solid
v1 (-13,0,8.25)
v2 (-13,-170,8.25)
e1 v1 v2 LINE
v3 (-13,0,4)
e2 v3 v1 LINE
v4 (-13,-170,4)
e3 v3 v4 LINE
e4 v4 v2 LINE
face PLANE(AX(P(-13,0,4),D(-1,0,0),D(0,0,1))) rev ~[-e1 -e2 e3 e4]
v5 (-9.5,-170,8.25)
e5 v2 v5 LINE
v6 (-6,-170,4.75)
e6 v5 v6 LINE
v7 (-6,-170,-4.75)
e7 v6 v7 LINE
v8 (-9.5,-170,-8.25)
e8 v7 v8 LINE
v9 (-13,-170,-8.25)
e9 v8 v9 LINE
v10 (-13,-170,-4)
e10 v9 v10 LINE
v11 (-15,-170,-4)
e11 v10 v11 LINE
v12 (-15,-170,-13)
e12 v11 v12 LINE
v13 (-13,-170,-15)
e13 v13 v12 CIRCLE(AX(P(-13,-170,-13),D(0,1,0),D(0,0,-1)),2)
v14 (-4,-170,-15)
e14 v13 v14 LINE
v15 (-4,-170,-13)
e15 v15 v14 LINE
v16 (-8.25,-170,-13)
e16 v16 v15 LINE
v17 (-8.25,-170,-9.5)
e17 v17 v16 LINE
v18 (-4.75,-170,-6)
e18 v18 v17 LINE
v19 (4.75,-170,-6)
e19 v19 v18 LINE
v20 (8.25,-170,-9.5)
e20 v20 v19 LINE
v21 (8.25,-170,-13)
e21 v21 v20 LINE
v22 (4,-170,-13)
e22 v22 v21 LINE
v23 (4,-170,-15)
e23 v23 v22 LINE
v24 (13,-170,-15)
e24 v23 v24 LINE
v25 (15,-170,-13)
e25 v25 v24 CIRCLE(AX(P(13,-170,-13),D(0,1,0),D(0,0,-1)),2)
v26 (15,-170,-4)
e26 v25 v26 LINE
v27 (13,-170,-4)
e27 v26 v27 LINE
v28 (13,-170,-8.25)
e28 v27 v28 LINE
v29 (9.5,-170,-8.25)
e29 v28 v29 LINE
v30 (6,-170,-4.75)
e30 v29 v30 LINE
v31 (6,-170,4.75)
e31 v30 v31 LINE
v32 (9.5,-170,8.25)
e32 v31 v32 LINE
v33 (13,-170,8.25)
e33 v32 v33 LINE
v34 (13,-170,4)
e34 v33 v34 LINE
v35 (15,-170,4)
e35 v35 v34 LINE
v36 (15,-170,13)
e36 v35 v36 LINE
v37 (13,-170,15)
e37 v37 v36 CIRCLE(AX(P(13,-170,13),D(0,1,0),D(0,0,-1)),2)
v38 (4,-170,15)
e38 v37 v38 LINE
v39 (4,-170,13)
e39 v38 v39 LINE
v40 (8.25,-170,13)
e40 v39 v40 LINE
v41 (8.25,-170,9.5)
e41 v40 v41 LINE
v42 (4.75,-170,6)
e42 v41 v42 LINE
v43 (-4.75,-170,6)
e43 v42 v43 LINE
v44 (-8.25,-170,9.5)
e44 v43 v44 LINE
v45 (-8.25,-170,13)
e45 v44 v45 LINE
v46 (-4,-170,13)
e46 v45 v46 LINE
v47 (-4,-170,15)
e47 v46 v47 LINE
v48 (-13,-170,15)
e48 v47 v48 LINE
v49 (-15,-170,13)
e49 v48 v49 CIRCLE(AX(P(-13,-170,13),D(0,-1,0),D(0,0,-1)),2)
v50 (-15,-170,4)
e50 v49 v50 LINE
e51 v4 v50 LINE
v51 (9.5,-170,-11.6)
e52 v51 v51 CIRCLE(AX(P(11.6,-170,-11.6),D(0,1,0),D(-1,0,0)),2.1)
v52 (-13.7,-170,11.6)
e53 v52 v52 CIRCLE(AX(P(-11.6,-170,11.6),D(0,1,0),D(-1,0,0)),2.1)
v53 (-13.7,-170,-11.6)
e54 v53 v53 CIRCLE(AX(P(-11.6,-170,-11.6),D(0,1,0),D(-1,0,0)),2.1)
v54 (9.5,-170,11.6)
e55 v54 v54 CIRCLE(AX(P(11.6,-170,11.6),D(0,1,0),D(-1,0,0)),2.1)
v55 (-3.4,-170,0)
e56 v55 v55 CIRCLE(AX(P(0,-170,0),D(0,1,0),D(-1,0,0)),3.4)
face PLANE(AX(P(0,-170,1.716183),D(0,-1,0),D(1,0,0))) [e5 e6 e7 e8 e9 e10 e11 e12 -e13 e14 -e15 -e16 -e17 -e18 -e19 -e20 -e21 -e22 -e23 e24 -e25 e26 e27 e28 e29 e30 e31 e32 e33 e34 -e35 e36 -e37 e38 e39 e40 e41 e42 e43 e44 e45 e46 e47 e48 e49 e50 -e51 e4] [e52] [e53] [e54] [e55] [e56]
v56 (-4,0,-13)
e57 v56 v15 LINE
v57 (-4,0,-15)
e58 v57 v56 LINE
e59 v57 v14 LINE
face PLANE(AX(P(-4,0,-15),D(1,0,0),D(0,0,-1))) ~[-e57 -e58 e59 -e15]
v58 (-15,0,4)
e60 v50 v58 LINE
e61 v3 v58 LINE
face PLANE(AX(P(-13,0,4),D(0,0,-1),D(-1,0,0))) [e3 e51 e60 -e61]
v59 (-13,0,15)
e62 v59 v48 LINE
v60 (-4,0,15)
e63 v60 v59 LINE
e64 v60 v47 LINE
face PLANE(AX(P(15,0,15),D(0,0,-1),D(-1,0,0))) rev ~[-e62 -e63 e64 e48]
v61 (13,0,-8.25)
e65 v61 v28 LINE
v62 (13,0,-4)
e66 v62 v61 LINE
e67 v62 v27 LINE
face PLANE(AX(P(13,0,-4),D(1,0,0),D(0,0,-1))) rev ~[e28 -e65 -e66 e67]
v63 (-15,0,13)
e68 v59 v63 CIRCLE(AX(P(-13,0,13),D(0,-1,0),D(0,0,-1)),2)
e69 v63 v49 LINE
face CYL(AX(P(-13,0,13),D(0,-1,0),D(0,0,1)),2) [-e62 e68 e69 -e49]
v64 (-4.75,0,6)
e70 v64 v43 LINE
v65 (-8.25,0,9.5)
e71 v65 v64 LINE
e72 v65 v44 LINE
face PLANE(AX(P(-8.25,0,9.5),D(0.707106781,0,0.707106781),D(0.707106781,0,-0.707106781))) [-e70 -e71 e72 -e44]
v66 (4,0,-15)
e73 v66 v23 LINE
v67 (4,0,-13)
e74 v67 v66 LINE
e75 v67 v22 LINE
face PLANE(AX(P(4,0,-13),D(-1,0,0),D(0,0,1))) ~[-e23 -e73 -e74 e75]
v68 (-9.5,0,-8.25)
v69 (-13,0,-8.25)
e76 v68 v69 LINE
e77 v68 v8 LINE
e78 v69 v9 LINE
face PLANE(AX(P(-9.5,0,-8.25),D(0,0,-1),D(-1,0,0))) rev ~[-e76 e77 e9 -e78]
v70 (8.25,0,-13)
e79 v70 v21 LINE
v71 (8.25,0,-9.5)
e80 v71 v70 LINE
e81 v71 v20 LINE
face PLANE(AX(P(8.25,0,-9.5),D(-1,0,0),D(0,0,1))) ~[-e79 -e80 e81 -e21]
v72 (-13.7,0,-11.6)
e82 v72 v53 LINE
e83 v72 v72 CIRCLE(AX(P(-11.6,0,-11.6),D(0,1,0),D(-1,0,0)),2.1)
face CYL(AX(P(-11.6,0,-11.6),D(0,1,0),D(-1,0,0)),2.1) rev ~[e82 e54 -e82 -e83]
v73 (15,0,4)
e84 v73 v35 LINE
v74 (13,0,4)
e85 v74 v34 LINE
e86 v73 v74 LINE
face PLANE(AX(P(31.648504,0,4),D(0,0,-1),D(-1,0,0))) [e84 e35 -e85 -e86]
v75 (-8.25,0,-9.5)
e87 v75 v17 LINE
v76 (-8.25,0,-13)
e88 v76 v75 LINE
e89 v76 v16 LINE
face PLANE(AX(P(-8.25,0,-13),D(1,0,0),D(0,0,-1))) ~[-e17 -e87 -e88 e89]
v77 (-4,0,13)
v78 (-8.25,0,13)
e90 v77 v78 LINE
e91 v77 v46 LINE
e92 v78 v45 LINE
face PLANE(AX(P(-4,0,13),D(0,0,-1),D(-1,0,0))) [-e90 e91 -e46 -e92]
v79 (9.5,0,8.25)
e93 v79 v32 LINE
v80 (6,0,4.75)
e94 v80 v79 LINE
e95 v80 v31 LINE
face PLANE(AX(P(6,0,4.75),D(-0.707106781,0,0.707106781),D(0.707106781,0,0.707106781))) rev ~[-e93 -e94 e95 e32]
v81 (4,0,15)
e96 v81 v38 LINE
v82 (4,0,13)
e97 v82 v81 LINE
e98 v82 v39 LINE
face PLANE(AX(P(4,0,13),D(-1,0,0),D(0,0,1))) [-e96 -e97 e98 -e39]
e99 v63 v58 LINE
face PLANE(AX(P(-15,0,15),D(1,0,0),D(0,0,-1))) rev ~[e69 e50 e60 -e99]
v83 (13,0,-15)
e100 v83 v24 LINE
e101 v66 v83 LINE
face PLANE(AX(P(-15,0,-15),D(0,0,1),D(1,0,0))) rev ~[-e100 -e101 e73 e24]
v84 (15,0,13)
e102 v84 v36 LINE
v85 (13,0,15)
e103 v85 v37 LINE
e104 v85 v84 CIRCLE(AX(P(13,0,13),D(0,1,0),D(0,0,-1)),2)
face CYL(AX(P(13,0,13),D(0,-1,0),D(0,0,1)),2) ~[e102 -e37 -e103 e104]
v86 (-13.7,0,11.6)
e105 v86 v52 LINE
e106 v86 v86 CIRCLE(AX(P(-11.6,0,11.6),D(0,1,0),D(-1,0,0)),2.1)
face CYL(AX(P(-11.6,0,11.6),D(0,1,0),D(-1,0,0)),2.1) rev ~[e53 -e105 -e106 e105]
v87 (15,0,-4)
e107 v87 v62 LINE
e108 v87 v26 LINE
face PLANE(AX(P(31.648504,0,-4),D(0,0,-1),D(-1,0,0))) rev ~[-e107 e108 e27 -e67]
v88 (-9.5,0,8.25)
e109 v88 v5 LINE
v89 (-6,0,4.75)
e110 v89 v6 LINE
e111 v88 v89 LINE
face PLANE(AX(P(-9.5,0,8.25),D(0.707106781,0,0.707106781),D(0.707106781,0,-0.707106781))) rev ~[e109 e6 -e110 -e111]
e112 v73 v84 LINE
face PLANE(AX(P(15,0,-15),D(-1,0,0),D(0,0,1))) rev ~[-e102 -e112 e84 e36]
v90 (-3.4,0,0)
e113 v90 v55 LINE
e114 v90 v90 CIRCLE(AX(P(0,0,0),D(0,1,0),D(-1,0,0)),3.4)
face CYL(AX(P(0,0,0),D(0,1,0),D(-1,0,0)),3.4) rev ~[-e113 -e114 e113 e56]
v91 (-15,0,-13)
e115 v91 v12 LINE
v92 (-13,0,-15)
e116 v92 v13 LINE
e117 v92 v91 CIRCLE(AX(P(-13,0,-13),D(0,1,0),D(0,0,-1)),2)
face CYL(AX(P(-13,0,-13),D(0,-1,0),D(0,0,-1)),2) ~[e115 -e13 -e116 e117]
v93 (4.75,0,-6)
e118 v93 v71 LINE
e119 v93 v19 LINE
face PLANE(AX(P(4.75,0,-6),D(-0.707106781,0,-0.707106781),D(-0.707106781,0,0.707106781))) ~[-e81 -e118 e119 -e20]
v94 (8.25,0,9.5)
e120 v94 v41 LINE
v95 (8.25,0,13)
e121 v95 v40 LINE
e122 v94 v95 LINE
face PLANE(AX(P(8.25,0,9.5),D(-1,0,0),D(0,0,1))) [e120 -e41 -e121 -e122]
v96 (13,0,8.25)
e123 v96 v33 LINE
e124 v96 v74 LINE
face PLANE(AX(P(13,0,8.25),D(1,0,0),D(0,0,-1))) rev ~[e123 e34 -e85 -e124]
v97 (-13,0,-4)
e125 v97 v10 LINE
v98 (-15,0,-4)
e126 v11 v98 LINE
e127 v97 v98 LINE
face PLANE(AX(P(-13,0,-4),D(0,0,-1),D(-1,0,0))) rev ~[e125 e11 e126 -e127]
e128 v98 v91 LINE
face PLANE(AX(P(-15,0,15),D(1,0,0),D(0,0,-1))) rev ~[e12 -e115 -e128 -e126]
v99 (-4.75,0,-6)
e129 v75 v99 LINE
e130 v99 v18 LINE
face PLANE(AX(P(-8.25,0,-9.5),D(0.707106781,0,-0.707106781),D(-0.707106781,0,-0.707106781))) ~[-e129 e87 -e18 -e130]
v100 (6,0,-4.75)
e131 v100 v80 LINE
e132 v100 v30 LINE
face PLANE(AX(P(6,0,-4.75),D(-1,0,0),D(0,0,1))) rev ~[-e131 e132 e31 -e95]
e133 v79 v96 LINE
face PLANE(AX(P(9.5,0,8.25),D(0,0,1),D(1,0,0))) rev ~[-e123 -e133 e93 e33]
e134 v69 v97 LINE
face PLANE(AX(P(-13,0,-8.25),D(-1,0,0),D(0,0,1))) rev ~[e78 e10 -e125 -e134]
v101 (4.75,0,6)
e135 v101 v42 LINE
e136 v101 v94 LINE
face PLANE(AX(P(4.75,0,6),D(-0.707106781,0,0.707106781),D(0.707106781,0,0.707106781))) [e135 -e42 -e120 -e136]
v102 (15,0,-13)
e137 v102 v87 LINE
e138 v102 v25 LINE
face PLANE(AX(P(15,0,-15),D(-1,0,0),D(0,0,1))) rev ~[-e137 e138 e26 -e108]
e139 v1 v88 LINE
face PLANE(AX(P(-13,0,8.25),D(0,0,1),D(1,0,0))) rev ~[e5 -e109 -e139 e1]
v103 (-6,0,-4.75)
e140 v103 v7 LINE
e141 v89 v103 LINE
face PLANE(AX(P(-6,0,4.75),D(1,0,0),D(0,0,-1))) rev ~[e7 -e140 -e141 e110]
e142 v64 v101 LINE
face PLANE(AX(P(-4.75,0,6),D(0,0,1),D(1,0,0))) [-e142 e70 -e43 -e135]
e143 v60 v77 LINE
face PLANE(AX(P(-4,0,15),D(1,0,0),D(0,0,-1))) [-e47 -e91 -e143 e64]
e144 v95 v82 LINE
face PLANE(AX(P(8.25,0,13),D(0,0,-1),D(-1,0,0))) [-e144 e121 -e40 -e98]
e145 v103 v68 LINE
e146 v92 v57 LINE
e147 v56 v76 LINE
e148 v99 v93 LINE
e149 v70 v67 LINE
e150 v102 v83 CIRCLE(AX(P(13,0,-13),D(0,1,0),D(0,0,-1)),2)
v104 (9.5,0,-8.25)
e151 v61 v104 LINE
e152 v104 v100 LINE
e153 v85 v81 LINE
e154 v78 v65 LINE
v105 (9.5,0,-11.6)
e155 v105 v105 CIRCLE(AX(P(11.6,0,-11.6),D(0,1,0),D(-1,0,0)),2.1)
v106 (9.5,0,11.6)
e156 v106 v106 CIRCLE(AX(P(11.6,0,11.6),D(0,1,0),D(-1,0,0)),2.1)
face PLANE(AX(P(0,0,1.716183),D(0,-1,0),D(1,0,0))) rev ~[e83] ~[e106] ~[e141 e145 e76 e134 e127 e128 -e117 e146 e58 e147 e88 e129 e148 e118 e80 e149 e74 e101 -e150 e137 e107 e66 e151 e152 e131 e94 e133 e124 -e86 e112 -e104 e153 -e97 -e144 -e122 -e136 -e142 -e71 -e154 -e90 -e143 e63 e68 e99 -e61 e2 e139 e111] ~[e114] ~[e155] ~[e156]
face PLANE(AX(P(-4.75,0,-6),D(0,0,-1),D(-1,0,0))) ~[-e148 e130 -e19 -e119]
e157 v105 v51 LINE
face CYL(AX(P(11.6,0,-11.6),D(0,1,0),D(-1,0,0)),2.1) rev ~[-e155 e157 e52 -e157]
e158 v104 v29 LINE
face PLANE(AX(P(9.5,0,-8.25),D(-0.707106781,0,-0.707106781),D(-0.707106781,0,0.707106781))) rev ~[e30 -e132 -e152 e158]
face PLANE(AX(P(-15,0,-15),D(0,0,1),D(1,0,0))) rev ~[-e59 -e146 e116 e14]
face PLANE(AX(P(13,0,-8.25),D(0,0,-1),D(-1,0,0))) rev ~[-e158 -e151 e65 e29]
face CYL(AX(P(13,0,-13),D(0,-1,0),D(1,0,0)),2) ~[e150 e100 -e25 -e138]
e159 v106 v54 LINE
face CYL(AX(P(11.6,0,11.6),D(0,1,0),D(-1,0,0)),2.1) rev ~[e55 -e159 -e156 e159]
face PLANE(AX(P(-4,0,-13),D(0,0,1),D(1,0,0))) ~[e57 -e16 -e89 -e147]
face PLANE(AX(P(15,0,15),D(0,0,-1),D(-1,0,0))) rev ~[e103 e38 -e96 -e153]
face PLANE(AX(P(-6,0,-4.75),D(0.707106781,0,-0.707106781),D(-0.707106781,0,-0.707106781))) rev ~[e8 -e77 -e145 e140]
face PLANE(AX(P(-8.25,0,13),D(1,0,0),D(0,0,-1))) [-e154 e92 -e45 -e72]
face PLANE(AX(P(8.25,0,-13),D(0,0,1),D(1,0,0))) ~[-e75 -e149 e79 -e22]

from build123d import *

# Parameters (mm, degrees)
F1_DEPTH = 170
F2_DEPTH = 400
F3_W     = 18.6485039899
F3_H     = 8
F3_W_2   = 19.9612321942
F3_R     = 3.4
F3_R_2   = 2.1
F4_DEPTH = 170
F5_R     = 2


# Not quite as in the source:
# - a pattern or mirror of a feature is missing from the dataset's text; its kind, count and spacing are read off the source's solid


with BuildPart() as f1:
    # F0 (on Front) → F1 (new body)
    with BuildSketch(Plane.XZ):
        Polygon((15, -15), (15, 15), (4, 15), (4, 13), (8.25, 13), (8.25, 9.5), (4.75, 6), (-4.75, 6), (-8.25, 9.5), (-8.25, 13), (-4, 13), (-4, 15), (-15, 15), (-15, -15), align=None)
        Polygon((4, 13), (4, 15), (-4, 15), (-4, 13), (-8.25, 13), (-8.25, 9.5), (-4.75, 6), (4.75, 6), (8.25, 9.5), (8.25, 13), align=None)
    extrude(amount=F1_DEPTH)

    # F0 (on Front) → F2 (cut)
    with BuildSketch(Plane.XZ):
        Polygon((4, 13), (4, 15), (-4, 15), (-4, 13), (-8.25, 13), (-8.25, 9.5), (-4.75, 6), (4.75, 6), (8.25, 9.5), (8.25, 13), align=None)
    f2 = extrude(amount=F2_DEPTH, mode=Mode.SUBTRACT)

    # F2_copies: F2 across plane
    add(f2.mirror(Plane(origin=(0, 0, 0), x_dir=(-1, 0, 0), z_dir=(0, 0, -1))), mode=Mode.SUBTRACT)

    # F3 (on face) → F4 (cut)
    with BuildSketch(Plane(origin=(0, 0, 0), x_dir=(-1, 0, 0), z_dir=(0, 1, 0))):
        Polygon((-6, 4.75), (-9.5, 8.25), (-13, 8.25), (-13, 4), (-13, -4), (-13, -8.25), (-9.5, -8.25), (-6, -4.75), align=None)
        with Locations((-22.3242519949, 0)):
            Rectangle(F3_W, F3_H)
        Polygon((13, 8.25), (9.5, 8.25), (6, 4.75), (6, -4.75), (9.5, -8.25), (13, -8.25), (13, -4), (13, 4), align=None)
        with Locations((22.9806160971, 0)):
            Rectangle(F3_W_2, F3_H)
        Circle(F3_R)
        with Locations((-11.6, 11.6)):
            Circle(F3_R_2)
        with Locations((-11.6, -11.6)):
            Circle(F3_R_2)
        with Locations((11.6, -11.6)):
            Circle(F3_R_2)
        with Locations((11.6, 11.6)):
            Circle(F3_R_2)
    extrude(amount=-F4_DEPTH, mode=Mode.SUBTRACT)

    # F5
    f5_edges = [f1.edges().sort_by_distance(p)[0] for p in [
        (-15, -85, 15),
        (-15, -85, -15),
        (15, -85, -15),
        (15, -85, 15),
    ]]
    fillet(f5_edges, radius=F5_R)


solid = f1.part
